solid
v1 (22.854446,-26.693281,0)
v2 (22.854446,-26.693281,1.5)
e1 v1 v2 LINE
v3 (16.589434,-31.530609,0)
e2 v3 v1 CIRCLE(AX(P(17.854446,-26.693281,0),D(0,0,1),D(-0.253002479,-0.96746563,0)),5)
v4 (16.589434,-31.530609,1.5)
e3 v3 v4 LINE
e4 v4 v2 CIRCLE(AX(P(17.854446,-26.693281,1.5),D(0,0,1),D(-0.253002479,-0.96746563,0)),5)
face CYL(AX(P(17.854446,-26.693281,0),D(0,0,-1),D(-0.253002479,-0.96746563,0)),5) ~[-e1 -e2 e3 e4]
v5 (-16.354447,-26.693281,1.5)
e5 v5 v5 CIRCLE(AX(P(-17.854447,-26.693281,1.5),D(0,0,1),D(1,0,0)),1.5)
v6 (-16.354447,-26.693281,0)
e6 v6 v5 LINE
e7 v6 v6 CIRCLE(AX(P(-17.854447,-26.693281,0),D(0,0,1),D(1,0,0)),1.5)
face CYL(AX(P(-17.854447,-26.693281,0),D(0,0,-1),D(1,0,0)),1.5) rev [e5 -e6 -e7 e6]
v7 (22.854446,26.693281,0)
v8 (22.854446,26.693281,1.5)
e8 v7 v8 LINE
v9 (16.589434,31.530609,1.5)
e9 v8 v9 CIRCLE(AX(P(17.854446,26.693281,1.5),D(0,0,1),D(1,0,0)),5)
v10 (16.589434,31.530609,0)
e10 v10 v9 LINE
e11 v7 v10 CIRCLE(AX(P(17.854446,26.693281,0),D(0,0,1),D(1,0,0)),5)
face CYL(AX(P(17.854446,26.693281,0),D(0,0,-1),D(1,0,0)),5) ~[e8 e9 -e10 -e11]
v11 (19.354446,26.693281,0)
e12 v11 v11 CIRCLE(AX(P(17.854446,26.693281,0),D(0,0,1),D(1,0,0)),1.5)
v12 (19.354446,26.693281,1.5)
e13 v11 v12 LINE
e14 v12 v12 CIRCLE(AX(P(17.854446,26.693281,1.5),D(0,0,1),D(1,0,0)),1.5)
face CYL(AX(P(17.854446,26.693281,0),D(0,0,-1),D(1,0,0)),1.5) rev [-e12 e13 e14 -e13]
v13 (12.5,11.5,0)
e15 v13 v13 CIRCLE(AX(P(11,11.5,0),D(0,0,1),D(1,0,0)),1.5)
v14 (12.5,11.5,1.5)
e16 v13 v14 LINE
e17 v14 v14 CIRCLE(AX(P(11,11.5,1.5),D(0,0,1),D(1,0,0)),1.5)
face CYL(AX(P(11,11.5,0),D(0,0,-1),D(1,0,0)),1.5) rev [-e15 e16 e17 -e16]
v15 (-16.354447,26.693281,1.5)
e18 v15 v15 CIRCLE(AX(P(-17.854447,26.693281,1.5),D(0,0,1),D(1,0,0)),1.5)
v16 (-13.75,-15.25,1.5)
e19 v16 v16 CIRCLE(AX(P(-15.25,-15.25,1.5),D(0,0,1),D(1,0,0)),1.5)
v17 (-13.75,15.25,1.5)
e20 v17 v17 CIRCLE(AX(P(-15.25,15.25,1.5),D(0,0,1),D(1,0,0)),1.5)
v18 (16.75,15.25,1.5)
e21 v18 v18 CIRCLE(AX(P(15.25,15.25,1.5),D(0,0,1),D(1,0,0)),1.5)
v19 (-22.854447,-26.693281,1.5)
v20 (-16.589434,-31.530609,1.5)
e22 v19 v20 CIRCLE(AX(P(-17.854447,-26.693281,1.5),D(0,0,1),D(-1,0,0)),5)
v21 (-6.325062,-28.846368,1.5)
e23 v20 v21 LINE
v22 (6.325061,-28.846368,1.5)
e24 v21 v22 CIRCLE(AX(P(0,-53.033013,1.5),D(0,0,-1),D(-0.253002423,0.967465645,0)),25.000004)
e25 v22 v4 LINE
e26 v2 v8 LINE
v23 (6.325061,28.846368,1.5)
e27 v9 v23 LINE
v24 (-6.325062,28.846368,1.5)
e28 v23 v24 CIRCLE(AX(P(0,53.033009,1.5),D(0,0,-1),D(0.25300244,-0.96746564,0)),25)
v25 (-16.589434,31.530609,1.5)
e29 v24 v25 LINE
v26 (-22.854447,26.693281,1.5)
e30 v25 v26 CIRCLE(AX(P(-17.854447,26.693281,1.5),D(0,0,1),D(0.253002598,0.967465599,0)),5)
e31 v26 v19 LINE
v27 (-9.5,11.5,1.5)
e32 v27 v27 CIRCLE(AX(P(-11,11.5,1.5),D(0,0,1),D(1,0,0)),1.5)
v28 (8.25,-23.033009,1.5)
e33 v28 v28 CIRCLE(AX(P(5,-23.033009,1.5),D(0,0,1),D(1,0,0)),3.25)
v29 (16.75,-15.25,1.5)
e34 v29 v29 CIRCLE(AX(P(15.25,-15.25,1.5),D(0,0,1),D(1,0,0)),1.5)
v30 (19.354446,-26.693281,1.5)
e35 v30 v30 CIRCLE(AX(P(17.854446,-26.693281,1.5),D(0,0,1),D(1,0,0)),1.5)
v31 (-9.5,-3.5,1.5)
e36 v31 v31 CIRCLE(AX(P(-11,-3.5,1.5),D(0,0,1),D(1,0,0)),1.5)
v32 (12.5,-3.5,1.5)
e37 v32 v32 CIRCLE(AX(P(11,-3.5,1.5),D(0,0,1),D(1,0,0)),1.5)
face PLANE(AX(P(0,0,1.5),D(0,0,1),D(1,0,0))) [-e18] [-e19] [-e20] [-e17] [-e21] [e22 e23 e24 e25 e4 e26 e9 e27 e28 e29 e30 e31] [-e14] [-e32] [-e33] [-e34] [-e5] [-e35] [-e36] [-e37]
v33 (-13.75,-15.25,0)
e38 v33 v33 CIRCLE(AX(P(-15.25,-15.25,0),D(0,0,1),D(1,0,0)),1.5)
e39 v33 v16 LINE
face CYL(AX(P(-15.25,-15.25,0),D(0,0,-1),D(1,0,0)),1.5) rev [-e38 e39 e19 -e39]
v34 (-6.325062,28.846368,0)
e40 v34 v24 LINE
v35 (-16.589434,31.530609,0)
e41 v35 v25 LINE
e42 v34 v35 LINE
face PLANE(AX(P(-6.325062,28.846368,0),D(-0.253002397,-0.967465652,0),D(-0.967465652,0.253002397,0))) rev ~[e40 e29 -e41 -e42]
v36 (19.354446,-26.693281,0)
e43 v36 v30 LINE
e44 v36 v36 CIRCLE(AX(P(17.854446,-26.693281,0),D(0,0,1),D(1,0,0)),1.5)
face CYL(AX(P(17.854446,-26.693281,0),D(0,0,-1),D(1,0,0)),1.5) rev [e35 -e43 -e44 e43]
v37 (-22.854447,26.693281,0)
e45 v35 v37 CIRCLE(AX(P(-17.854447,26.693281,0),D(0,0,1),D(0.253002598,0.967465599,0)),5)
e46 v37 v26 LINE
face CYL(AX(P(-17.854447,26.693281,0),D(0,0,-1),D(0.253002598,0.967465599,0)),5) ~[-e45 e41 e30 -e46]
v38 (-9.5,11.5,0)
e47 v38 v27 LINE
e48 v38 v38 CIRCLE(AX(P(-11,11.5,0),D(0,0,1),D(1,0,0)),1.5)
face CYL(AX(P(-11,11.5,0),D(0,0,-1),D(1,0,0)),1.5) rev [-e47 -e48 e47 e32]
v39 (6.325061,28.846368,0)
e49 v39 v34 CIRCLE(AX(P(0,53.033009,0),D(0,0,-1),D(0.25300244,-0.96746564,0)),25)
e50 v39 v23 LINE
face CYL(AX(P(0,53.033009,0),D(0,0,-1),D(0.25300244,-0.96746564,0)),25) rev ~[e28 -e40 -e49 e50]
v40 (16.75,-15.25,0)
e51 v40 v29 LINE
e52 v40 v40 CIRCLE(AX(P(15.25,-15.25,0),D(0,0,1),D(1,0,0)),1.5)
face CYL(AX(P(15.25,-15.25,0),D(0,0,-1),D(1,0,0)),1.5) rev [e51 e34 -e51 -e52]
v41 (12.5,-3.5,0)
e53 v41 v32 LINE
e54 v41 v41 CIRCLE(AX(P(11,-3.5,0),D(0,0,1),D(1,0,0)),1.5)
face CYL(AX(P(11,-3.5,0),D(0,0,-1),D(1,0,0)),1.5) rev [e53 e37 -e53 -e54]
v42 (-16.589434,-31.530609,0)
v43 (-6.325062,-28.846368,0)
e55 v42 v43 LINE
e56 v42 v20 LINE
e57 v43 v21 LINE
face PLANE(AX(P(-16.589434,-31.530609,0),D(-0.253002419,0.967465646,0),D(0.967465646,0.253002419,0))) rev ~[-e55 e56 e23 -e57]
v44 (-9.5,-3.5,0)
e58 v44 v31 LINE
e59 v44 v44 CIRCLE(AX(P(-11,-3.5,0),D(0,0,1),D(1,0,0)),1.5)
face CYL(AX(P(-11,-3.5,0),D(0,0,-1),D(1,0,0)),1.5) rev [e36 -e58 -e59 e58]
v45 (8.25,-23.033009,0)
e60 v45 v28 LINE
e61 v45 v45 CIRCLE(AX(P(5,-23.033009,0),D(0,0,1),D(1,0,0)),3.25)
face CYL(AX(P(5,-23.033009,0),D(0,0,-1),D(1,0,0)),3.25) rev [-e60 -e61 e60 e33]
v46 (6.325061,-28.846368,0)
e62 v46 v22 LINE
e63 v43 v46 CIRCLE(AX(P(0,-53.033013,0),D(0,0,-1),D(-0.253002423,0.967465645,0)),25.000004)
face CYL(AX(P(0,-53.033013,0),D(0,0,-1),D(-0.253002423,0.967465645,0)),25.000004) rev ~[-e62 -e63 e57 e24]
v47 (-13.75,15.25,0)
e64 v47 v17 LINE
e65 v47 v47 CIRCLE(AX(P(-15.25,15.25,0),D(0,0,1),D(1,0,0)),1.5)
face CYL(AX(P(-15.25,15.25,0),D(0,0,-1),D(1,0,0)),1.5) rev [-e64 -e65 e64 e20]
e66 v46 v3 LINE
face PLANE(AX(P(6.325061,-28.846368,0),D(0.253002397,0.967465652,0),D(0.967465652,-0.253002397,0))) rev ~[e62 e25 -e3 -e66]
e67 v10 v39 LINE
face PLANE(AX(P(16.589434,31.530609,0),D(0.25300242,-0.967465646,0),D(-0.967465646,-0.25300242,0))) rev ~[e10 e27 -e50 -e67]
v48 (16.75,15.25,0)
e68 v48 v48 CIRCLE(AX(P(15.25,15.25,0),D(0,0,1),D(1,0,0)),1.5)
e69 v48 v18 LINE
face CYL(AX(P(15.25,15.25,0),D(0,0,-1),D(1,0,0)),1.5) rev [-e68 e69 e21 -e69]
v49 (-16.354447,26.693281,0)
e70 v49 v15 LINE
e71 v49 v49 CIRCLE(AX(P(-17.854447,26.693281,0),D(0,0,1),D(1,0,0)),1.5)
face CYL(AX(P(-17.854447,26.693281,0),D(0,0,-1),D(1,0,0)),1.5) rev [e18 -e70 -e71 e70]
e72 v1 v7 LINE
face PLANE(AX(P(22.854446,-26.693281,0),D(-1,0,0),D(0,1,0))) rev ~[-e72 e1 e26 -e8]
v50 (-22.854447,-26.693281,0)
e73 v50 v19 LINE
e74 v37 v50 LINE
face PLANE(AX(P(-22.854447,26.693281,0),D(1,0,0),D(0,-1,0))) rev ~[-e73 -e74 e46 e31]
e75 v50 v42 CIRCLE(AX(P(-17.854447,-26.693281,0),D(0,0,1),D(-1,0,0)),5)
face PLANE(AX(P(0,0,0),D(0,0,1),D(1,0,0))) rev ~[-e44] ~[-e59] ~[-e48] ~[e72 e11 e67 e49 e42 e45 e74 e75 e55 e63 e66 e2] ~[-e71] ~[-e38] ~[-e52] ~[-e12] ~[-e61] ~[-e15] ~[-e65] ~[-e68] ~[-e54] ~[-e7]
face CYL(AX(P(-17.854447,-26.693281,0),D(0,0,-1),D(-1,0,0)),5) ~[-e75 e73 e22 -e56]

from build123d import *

# Parameters (mm, degrees)
F0_R     = 1.5
F0_R_2   = 3.25
F1_DEPTH = 1.5


# Not quite as in the source:
# - ends of sketch curves that miss each other by under 0.0002 mm in the source are joined


with BuildPart() as f1:
    # F0 (on Top) → F1 (new body)
    with BuildSketch(Plane.XY):
        with BuildLine():
            ThreePointArc((6.3250610024, 28.8463679906), (-4.837e-07, 28.033009), (-6.3250619384, 28.8463682354))
            Line((-6.3250619384, 28.8463682354), (-16.589434, 31.530609))
            ThreePointArc((-16.589434, 31.530609), (-20.910174001, 30.6508727545), (-22.854447, 26.693281))
            Line((-22.854447, 26.693281), (-22.854447, -26.693281))
            ThreePointArc((-22.854447, -26.693281), (-20.910174001, -30.6508727545), (-16.5894340018, -31.5306089933))
            Line((-16.5894340018, -31.5306089933), (-6.325062, -28.846368))
            ThreePointArc((-6.325062, -28.846368), (-4.837e-07, -28.033009), (6.3250610024, -28.8463679906))
            Line((6.3250610024, -28.8463679906), (16.589434, -31.530609))
            ThreePointArc((16.589434, -31.530609), (20.9101733838, -30.6508724589), (22.854446, -26.693281))
            Line((22.854446, -26.693281), (22.854446, 26.693281))
            ThreePointArc((22.854446, 26.693281), (20.9101733838, 30.6508724589), (16.5894339378, 31.530609238))
            Line((16.5894339378, 31.530609238), (6.3250610024, 28.8463679906))
        make_face()
        with Locations((-17.854447, -26.693281)):
            Circle(F0_R, mode=Mode.SUBTRACT)
        with Locations((-15.25, -15.25)):
            Circle(F0_R, mode=Mode.SUBTRACT)
        with Locations((-11, -3.5)):
            Circle(F0_R, mode=Mode.SUBTRACT)
        with Locations((5, -23.033009)):
            Circle(F0_R_2, mode=Mode.SUBTRACT)
        with Locations((17.854446, -26.693281)):
            Circle(F0_R, mode=Mode.SUBTRACT)
        with Locations((11, -3.5)):
            Circle(F0_R, mode=Mode.SUBTRACT)
        with Locations((15.25, -15.25)):
            Circle(F0_R, mode=Mode.SUBTRACT)
        with Locations((-15.25, 15.25)):
            Circle(F0_R, mode=Mode.SUBTRACT)
        with Locations((-11, 11.5)):
            Circle(F0_R, mode=Mode.SUBTRACT)
        with Locations((-17.854447, 26.693281)):
            Circle(F0_R, mode=Mode.SUBTRACT)
        with Locations((11, 11.5)):
            Circle(F0_R, mode=Mode.SUBTRACT)
        with Locations((15.25, 15.25)):
            Circle(F0_R, mode=Mode.SUBTRACT)
        with Locations((17.854446, 26.693281)):
            Circle(F0_R, mode=Mode.SUBTRACT)
    extrude(amount=F1_DEPTH)


solid = f1.part
